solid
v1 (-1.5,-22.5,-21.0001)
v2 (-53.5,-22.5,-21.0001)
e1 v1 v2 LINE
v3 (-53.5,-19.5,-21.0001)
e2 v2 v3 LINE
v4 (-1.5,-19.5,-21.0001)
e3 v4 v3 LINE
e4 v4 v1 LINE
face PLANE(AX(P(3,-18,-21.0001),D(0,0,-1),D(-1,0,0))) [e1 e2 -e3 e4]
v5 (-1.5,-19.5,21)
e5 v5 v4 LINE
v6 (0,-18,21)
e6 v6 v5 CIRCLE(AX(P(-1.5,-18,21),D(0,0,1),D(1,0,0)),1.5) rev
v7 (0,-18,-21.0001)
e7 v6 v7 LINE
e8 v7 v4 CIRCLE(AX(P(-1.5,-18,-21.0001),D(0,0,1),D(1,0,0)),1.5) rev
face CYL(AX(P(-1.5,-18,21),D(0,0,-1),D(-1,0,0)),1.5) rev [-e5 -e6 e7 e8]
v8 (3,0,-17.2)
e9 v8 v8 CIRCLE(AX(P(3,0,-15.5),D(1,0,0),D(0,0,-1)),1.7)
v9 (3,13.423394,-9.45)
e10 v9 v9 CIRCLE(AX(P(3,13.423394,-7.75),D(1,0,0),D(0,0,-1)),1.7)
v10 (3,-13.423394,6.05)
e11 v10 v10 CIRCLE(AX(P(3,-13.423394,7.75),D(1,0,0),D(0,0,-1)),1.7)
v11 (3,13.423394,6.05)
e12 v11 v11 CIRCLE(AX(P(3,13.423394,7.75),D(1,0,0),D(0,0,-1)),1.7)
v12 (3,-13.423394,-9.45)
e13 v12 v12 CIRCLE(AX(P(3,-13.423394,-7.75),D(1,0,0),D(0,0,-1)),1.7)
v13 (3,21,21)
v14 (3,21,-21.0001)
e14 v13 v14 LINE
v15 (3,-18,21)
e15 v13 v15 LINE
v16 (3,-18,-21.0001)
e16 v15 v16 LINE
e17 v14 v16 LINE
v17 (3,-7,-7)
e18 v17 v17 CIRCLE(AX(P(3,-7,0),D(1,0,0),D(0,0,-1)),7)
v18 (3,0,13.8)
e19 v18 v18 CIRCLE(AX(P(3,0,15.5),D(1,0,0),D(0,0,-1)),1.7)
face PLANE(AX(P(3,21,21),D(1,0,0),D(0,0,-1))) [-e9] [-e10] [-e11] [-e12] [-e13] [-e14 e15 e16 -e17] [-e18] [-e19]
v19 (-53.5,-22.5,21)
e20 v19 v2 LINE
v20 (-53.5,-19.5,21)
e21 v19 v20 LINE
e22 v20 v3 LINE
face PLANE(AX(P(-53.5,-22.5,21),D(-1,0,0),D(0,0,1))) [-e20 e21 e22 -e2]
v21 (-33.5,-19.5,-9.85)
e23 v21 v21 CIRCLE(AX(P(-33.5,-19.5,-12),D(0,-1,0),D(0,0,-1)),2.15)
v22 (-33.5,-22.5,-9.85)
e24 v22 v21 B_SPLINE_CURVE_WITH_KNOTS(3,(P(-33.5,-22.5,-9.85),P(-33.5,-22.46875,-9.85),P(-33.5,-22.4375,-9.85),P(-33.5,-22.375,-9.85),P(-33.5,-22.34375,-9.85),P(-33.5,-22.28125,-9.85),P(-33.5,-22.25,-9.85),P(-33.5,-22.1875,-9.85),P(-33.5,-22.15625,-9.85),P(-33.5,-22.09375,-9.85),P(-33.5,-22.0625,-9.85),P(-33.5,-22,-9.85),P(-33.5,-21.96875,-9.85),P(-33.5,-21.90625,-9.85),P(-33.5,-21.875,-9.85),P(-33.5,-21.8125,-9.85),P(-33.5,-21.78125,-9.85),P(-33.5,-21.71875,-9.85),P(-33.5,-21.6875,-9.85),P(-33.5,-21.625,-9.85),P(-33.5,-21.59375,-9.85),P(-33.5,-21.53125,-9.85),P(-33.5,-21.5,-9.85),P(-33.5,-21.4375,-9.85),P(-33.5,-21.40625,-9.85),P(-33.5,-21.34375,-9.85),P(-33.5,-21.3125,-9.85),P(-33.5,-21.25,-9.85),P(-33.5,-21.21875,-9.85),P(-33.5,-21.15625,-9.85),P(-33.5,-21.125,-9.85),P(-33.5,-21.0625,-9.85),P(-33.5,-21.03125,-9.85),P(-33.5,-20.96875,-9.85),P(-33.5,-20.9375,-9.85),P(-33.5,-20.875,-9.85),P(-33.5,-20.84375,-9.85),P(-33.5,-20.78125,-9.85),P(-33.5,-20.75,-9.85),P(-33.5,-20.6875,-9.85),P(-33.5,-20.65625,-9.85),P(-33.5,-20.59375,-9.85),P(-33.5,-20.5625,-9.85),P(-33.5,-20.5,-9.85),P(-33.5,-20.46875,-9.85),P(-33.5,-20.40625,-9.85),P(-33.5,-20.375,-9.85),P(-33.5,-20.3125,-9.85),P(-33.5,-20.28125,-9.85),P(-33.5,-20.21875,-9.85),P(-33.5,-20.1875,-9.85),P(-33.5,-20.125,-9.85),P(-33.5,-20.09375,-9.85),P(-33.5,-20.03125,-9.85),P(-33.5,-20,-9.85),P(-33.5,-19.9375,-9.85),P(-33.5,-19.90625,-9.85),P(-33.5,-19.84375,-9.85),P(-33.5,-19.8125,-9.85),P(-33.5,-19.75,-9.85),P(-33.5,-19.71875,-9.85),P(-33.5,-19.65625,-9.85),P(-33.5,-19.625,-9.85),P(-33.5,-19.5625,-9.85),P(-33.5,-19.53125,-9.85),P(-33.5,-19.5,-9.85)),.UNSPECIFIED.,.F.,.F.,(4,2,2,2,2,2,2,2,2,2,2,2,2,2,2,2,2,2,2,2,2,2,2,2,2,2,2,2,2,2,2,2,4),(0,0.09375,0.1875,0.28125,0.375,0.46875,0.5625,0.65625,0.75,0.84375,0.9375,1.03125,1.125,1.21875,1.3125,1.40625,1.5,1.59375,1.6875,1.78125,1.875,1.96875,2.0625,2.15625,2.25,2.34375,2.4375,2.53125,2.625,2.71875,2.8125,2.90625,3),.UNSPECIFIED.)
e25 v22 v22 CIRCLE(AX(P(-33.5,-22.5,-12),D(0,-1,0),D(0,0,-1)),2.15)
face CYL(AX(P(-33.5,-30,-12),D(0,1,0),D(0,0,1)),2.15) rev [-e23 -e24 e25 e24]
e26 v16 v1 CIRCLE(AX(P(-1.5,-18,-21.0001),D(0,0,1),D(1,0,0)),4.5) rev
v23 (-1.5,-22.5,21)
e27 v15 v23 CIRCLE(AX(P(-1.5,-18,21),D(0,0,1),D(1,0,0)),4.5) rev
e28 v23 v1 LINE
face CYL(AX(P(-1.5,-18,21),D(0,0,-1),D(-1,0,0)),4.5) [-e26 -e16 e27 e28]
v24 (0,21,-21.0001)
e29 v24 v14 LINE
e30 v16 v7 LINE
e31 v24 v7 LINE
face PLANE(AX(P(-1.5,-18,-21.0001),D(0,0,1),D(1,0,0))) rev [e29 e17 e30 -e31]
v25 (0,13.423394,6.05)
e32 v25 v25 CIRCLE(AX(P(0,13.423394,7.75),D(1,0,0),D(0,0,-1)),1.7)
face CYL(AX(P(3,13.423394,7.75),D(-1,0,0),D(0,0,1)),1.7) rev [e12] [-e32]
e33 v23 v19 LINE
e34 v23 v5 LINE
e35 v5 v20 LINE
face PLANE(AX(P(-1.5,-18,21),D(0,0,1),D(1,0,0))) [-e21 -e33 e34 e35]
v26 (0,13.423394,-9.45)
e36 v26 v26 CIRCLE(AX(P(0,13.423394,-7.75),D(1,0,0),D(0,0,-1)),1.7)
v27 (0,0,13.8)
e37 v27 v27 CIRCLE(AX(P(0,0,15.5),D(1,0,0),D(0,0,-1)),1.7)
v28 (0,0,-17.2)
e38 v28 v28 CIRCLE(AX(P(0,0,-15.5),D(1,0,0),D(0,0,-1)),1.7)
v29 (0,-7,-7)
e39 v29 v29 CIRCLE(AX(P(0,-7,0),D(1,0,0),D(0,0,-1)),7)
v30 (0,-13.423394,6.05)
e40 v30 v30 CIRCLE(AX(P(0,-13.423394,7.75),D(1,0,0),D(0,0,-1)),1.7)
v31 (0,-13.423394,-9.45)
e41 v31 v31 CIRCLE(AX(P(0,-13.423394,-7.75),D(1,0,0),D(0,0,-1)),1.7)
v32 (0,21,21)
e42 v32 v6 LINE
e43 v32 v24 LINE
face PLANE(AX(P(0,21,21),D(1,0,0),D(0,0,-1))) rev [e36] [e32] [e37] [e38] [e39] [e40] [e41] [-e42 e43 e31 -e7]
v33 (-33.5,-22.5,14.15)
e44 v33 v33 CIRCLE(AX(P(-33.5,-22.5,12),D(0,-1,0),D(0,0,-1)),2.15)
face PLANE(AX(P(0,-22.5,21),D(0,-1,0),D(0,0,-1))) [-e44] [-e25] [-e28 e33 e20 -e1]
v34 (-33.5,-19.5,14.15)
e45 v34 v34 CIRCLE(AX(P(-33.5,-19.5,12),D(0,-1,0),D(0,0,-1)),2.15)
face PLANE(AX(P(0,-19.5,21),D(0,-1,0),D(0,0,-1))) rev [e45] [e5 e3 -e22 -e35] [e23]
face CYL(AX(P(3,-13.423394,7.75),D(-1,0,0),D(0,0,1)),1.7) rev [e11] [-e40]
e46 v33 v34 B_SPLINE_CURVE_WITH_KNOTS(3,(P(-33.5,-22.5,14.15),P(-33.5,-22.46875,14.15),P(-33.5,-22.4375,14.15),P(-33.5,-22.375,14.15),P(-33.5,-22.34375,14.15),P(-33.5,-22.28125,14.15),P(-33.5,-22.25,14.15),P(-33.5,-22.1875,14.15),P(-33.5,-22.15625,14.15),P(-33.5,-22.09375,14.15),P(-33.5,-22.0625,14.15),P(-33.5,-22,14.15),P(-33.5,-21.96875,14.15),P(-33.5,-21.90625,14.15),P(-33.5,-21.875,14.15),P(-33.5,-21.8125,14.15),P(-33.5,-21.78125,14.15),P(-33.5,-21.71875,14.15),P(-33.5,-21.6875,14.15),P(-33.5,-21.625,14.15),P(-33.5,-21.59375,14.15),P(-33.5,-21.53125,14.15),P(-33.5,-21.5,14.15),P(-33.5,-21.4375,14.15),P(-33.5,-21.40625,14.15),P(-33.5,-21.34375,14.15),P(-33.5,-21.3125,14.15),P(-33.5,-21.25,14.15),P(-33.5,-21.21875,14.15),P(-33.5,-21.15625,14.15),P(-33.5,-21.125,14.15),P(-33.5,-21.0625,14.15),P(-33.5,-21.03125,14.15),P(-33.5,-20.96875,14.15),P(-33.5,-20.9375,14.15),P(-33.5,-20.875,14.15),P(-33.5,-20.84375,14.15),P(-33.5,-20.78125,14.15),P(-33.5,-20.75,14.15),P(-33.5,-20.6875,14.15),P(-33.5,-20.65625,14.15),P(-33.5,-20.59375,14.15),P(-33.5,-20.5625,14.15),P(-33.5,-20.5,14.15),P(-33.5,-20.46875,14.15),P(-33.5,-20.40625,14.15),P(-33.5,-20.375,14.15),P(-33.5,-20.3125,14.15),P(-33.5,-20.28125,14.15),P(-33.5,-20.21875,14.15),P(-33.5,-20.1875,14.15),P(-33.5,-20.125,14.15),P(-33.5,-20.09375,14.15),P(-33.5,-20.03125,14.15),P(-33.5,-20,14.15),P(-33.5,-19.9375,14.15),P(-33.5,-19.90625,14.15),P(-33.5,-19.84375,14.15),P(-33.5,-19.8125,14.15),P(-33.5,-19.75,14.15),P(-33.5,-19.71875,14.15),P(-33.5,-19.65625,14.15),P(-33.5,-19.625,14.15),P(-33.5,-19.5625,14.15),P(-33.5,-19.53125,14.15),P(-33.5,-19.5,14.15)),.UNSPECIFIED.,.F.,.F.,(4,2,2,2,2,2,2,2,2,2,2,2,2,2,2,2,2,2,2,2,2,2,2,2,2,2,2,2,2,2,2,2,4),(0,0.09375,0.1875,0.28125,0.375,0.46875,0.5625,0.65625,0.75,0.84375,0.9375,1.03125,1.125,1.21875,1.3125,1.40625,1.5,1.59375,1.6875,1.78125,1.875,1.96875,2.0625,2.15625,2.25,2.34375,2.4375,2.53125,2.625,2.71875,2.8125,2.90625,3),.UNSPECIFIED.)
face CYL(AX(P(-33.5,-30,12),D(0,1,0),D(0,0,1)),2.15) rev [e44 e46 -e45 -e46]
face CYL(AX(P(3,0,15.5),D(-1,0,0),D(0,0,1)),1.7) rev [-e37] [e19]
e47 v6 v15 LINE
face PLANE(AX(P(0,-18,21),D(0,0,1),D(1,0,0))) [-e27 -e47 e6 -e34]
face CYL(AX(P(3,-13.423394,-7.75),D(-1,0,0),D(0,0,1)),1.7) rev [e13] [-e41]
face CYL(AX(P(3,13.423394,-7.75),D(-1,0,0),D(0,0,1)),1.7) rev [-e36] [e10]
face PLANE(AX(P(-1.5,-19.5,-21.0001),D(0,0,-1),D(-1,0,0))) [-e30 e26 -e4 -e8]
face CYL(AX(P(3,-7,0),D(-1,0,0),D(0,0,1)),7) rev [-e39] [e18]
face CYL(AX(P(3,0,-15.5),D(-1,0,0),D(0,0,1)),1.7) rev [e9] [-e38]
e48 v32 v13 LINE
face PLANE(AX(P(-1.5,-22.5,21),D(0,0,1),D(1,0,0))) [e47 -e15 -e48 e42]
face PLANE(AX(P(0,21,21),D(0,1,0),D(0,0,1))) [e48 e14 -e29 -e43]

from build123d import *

# Parameters (mm, degrees)
SM_BRACKET_DEPTH     = 42
SK_MOTORHOLES_R      = 1.7
SK_MOTORHOLES_R_2    = 7
CUT_MOTORHOLES_DEPTH = 3
SK_RAILHOLES_R       = 2.15
CUT_RAILHOLES_DEPTH  = 30


# Sheet-metal steps are written as plain solids
with BuildPart() as part:
    # SK_Bracket → SM_Bracket (new body)
    with BuildSketch(Plane.XY.offset(-21)):
        with BuildLine():
            Line((0, 21), (0, -18))
            ThreePointArc((0, -18), (-0.439339828, -19.060660172), (-1.5, -19.5))
            Line((-1.5, -19.5), (-53.5, -19.5))
            Line((-53.5, -19.5), (-53.5, -22.5))
            Line((-53.5, -22.5), (-1.5, -22.5))
            ThreePointArc((-1.5, -22.5), (1.681980515, -21.181980515), (3, -18))
            Line((3, -18), (3, 21))
            Line((3, 21), (0, 21))
        make_face()
    extrude(amount=SM_BRACKET_DEPTH)

    # SK_MotorHoles → CUT_MotorHoles (cut)
    with BuildSketch(Plane(origin=(0, 0, 0), x_dir=(0, 0, -1), z_dir=(1, 0, 0))):
        with Locations((-15.5, 0)):
            Circle(SK_MOTORHOLES_R)
        with Locations((-7.75, 13.423393759)):
            Circle(SK_MOTORHOLES_R)
        with Locations((7.75, 13.423393759)):
            Circle(SK_MOTORHOLES_R)
        with Locations((15.5, 0)):
            Circle(SK_MOTORHOLES_R)
        with Locations((7.75, -13.423393759)):
            Circle(SK_MOTORHOLES_R)
        with Locations((-7.75, -13.423393759)):
            Circle(SK_MOTORHOLES_R)
        with Locations((0, -7)):
            Circle(SK_MOTORHOLES_R_2)
    extrude(amount=CUT_MOTORHOLES_DEPTH, mode=Mode.SUBTRACT)

    # SK_RailHoles → CUT_RailHoles (cut)
    with BuildSketch(Plane(origin=(0, 0, 0), x_dir=(1, 0, 0), z_dir=(0, 1, 0))):
        with Locations(Location((-33.5, -12, 0), (0, 0, 270))):
            Circle(SK_RAILHOLES_R)
        with Locations(Location((-33.5, 12, 0), (0, 0, 270))):
            Circle(SK_RAILHOLES_R)
    extrude(amount=-CUT_RAILHOLES_DEPTH, mode=Mode.SUBTRACT)


solid = part.part
